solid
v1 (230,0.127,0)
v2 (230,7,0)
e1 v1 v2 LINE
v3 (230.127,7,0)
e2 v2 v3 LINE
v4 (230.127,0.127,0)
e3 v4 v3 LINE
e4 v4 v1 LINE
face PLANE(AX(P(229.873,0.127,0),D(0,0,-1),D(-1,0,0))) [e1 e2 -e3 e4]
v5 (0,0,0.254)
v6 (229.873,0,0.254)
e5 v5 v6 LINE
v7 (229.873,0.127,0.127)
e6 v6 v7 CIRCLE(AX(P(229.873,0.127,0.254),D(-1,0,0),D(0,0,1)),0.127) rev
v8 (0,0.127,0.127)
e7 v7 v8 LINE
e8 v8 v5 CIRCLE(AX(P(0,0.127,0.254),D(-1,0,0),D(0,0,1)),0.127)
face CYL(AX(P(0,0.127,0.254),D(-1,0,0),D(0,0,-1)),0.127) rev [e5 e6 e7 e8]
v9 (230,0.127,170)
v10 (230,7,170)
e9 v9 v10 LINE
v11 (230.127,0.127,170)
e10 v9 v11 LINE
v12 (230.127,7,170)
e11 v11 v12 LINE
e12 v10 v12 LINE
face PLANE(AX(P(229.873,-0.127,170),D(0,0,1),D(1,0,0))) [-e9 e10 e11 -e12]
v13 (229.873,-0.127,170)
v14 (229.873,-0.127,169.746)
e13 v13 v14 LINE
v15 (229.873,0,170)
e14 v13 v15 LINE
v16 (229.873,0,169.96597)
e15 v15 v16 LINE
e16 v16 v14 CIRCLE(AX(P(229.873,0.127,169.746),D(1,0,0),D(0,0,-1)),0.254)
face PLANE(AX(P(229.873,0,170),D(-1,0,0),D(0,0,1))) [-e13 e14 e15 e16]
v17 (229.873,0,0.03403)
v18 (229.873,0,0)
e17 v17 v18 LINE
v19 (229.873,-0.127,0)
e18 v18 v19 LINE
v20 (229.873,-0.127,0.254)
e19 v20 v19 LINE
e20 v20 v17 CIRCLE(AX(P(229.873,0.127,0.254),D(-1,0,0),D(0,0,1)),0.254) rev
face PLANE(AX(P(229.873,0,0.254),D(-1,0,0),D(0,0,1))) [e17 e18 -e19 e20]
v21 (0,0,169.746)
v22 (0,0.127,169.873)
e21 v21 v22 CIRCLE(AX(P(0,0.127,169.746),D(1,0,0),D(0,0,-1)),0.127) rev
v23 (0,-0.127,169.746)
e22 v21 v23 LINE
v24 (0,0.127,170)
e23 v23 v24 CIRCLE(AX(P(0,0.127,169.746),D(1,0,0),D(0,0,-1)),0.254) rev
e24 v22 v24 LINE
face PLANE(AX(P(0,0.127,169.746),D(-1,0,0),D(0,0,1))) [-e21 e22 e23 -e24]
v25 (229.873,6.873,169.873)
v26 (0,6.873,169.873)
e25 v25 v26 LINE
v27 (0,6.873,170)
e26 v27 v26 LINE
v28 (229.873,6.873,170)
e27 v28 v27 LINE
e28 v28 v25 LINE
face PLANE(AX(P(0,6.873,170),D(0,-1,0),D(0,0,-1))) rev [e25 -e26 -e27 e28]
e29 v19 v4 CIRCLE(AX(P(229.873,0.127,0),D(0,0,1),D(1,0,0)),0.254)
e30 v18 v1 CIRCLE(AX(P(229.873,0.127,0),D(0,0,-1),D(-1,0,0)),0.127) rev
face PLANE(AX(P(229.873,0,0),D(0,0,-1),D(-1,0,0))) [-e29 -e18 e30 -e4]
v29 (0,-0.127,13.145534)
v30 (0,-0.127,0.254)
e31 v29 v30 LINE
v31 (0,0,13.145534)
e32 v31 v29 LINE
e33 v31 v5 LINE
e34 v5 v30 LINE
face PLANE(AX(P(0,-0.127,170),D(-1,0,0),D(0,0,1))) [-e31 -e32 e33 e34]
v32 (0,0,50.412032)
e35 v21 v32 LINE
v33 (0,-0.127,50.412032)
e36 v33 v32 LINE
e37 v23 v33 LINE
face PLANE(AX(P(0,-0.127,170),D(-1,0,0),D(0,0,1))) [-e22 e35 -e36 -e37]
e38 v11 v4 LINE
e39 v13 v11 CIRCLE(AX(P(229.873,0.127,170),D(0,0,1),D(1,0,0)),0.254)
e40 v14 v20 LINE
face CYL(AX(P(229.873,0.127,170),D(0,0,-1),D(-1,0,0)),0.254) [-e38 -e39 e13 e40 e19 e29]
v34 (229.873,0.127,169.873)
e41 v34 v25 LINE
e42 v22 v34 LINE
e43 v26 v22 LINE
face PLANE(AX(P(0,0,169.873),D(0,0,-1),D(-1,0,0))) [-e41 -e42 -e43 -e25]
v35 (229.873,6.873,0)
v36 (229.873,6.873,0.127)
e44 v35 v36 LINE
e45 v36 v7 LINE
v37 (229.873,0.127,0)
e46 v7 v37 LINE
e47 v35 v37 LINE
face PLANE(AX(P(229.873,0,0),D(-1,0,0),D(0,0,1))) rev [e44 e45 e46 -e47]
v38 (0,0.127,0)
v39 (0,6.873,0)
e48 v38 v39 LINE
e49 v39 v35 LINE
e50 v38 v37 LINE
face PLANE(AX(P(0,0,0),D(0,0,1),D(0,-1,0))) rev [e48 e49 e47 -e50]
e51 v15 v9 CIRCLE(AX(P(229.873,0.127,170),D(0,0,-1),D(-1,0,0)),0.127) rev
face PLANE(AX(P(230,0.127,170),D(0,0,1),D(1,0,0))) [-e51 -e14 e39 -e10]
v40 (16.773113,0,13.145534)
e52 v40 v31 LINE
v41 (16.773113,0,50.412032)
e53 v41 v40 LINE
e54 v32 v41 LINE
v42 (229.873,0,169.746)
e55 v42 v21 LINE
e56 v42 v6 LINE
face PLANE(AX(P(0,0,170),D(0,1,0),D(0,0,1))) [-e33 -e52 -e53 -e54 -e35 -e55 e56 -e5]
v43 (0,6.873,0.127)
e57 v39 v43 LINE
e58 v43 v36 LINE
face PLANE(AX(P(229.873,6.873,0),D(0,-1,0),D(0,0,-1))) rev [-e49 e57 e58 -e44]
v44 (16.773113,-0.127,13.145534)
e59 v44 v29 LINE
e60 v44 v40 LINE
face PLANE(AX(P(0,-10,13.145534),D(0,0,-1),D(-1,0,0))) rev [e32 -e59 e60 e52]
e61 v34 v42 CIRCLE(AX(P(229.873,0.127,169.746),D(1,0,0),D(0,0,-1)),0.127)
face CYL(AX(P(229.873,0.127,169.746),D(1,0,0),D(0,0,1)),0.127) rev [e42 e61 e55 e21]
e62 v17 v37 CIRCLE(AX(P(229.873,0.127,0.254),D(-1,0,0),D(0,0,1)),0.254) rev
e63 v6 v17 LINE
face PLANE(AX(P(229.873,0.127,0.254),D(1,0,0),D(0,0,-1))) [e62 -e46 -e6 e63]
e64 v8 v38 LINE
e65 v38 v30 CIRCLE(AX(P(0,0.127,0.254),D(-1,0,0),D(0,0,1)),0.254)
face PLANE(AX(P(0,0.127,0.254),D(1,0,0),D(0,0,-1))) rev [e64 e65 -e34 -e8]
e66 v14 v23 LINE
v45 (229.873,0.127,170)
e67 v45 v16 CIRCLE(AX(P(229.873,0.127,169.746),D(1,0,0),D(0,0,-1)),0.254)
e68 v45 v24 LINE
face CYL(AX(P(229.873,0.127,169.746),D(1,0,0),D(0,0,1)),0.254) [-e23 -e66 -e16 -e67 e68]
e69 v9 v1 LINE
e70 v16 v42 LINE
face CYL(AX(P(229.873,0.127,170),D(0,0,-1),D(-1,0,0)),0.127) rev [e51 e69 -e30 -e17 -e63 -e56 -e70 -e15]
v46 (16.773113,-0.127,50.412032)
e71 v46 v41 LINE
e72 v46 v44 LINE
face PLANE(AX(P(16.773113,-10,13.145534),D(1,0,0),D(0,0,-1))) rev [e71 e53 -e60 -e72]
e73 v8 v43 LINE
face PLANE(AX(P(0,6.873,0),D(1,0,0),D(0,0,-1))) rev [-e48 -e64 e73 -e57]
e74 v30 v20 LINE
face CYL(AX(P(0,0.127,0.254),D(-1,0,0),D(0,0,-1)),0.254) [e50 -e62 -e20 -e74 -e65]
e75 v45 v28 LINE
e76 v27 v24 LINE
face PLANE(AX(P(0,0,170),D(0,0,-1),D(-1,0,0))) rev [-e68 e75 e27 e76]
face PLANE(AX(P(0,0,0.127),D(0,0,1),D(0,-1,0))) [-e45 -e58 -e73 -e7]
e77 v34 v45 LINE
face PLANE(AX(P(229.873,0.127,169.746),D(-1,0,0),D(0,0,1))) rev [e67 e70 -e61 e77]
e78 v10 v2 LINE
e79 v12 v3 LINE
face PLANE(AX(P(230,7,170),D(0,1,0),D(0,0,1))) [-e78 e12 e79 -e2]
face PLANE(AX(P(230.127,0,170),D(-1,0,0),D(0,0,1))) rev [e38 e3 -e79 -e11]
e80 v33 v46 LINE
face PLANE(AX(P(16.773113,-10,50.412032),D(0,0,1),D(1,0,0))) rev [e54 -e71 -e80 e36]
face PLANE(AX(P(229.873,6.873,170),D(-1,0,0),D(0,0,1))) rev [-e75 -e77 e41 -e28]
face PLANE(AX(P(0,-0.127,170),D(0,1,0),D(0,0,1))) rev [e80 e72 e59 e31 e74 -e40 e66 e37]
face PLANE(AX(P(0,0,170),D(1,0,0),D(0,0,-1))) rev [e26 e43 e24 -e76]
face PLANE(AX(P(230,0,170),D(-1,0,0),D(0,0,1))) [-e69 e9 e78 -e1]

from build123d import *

# Parameters (mm, degrees)
BASE_FLANGE1_DEPTH             = 170
EDGE_FLANGE1_STRIP_W           = 0.762
EDGE_FLANGE1_STRIP_H           = 0.127
EDGE_FLANGE1_STRIP_CUT_DEPTH   = 229.873
EDGE_FLANGE1_STRIP_2_W         = 0.762
EDGE_FLANGE1_STRIP_2_H         = 0.127
EDGE_FLANGE1_STRIP_CUT_2_DEPTH = 229.873
EDGE_FLANGE1_DEPTH             = 229.873
EDGE_FLANGE1_BEND_DEPTH        = 229.873
SKETCH19_W                     = 16.773112734
SKETCH19_H                     = 37.266497541
CUT_EXTRUDE1_DEPTH             = 10


# Sheet-metal steps are written as plain solids
with BuildPart() as part:
    # Sketch1 → Base-Flange1 (new body)
    with BuildSketch(Plane.XY):
        with BuildLine():
            Line((0, 0), (229.873, 0))
            ThreePointArc((229.873, 0), (229.962802561, 0.037197439), (230, 0.127))
            Line((230, 0.127), (230, 7))
            Line((230, 7), (230.127, 7))
            Line((230.127, 7), (230.127, 0.127))
            ThreePointArc((230.127, 0.127), (230.052605122, -0.052605122), (229.873, -0.127))
            Line((229.873, -0.127), (0, -0.127))
            Line((0, -0.127), (0, 0))
        make_face()
    extrude(amount=BASE_FLANGE1_DEPTH)

    # Edge-Flange1 strip (across the edge) → Edge-Flange1 strip cut (cut)
    with BuildSketch(Plane.ZY.offset(-229.873)):
        with Locations((-0.127, -0.0635)):
            Rectangle(EDGE_FLANGE1_STRIP_W, EDGE_FLANGE1_STRIP_H)
    extrude(amount=EDGE_FLANGE1_STRIP_CUT_DEPTH, mode=Mode.SUBTRACT)

    # Edge-Flange1 strip 2 (across the edge) → Edge-Flange1 strip cut 2 (cut)
    with BuildSketch(Plane(origin=(0, 0, 170), x_dir=(0, 0, -1), z_dir=(1, 0, 0))):
        with Locations((-0.127, -0.0635)):
            Rectangle(EDGE_FLANGE1_STRIP_2_W, EDGE_FLANGE1_STRIP_2_H)
    extrude(amount=EDGE_FLANGE1_STRIP_CUT_2_DEPTH, mode=Mode.SUBTRACT)

    # Edge-Flange1 section (across the edge) → Edge-Flange1 (add)
    with BuildSketch(Plane.ZY.offset(-229.873)):
        with BuildLine():
            Line((0, 0.127), (0, 6.873))
            Line((0, 6.873), (0.127, 6.873))
            Line((0.127, 6.873), (0.127, 0.127))
            ThreePointArc((0.127, 0.127), (0.164197439, 0.037197439), (0.254, 0))
            Line((0.254, 0), (0.254, -0.127))
            ThreePointArc((0.254, -0.127), (0.074394878, -0.052605122), (0, 0.127))
        make_face()
    extrude(amount=EDGE_FLANGE1_DEPTH)

    # Edge-Flange1 section 2 (across the edge) → Edge-Flange1 bend (add)
    with BuildSketch(Plane(origin=(0, 0, 170), x_dir=(0, 0, -1), z_dir=(1, 0, 0))):
        with BuildLine():
            Line((0, 0.127), (0, 6.873))
            Line((0, 6.873), (0.127, 6.873))
            Line((0.127, 6.873), (0.127, 0.127))
            ThreePointArc((0.127, 0.127), (0.164197439, 0.037197439), (0.254, 0))
            Line((0.254, 0), (0.254, -0.127))
            ThreePointArc((0.254, -0.127), (0.074394878, -0.052605122), (0, 0.127))
        make_face()
    extrude(amount=EDGE_FLANGE1_BEND_DEPTH)

    # Sketch19 → Cut-Extrude1 (cut)
    with BuildSketch(Plane(origin=(0, 0, 0), x_dir=(1, 0, 0), z_dir=(0, 1, 0))):
        with Locations((8.386556367, -31.778783199)):
            Rectangle(SKETCH19_W, SKETCH19_H)
    extrude(amount=-CUT_EXTRUDE1_DEPTH, mode=Mode.SUBTRACT)


solid = part.part
